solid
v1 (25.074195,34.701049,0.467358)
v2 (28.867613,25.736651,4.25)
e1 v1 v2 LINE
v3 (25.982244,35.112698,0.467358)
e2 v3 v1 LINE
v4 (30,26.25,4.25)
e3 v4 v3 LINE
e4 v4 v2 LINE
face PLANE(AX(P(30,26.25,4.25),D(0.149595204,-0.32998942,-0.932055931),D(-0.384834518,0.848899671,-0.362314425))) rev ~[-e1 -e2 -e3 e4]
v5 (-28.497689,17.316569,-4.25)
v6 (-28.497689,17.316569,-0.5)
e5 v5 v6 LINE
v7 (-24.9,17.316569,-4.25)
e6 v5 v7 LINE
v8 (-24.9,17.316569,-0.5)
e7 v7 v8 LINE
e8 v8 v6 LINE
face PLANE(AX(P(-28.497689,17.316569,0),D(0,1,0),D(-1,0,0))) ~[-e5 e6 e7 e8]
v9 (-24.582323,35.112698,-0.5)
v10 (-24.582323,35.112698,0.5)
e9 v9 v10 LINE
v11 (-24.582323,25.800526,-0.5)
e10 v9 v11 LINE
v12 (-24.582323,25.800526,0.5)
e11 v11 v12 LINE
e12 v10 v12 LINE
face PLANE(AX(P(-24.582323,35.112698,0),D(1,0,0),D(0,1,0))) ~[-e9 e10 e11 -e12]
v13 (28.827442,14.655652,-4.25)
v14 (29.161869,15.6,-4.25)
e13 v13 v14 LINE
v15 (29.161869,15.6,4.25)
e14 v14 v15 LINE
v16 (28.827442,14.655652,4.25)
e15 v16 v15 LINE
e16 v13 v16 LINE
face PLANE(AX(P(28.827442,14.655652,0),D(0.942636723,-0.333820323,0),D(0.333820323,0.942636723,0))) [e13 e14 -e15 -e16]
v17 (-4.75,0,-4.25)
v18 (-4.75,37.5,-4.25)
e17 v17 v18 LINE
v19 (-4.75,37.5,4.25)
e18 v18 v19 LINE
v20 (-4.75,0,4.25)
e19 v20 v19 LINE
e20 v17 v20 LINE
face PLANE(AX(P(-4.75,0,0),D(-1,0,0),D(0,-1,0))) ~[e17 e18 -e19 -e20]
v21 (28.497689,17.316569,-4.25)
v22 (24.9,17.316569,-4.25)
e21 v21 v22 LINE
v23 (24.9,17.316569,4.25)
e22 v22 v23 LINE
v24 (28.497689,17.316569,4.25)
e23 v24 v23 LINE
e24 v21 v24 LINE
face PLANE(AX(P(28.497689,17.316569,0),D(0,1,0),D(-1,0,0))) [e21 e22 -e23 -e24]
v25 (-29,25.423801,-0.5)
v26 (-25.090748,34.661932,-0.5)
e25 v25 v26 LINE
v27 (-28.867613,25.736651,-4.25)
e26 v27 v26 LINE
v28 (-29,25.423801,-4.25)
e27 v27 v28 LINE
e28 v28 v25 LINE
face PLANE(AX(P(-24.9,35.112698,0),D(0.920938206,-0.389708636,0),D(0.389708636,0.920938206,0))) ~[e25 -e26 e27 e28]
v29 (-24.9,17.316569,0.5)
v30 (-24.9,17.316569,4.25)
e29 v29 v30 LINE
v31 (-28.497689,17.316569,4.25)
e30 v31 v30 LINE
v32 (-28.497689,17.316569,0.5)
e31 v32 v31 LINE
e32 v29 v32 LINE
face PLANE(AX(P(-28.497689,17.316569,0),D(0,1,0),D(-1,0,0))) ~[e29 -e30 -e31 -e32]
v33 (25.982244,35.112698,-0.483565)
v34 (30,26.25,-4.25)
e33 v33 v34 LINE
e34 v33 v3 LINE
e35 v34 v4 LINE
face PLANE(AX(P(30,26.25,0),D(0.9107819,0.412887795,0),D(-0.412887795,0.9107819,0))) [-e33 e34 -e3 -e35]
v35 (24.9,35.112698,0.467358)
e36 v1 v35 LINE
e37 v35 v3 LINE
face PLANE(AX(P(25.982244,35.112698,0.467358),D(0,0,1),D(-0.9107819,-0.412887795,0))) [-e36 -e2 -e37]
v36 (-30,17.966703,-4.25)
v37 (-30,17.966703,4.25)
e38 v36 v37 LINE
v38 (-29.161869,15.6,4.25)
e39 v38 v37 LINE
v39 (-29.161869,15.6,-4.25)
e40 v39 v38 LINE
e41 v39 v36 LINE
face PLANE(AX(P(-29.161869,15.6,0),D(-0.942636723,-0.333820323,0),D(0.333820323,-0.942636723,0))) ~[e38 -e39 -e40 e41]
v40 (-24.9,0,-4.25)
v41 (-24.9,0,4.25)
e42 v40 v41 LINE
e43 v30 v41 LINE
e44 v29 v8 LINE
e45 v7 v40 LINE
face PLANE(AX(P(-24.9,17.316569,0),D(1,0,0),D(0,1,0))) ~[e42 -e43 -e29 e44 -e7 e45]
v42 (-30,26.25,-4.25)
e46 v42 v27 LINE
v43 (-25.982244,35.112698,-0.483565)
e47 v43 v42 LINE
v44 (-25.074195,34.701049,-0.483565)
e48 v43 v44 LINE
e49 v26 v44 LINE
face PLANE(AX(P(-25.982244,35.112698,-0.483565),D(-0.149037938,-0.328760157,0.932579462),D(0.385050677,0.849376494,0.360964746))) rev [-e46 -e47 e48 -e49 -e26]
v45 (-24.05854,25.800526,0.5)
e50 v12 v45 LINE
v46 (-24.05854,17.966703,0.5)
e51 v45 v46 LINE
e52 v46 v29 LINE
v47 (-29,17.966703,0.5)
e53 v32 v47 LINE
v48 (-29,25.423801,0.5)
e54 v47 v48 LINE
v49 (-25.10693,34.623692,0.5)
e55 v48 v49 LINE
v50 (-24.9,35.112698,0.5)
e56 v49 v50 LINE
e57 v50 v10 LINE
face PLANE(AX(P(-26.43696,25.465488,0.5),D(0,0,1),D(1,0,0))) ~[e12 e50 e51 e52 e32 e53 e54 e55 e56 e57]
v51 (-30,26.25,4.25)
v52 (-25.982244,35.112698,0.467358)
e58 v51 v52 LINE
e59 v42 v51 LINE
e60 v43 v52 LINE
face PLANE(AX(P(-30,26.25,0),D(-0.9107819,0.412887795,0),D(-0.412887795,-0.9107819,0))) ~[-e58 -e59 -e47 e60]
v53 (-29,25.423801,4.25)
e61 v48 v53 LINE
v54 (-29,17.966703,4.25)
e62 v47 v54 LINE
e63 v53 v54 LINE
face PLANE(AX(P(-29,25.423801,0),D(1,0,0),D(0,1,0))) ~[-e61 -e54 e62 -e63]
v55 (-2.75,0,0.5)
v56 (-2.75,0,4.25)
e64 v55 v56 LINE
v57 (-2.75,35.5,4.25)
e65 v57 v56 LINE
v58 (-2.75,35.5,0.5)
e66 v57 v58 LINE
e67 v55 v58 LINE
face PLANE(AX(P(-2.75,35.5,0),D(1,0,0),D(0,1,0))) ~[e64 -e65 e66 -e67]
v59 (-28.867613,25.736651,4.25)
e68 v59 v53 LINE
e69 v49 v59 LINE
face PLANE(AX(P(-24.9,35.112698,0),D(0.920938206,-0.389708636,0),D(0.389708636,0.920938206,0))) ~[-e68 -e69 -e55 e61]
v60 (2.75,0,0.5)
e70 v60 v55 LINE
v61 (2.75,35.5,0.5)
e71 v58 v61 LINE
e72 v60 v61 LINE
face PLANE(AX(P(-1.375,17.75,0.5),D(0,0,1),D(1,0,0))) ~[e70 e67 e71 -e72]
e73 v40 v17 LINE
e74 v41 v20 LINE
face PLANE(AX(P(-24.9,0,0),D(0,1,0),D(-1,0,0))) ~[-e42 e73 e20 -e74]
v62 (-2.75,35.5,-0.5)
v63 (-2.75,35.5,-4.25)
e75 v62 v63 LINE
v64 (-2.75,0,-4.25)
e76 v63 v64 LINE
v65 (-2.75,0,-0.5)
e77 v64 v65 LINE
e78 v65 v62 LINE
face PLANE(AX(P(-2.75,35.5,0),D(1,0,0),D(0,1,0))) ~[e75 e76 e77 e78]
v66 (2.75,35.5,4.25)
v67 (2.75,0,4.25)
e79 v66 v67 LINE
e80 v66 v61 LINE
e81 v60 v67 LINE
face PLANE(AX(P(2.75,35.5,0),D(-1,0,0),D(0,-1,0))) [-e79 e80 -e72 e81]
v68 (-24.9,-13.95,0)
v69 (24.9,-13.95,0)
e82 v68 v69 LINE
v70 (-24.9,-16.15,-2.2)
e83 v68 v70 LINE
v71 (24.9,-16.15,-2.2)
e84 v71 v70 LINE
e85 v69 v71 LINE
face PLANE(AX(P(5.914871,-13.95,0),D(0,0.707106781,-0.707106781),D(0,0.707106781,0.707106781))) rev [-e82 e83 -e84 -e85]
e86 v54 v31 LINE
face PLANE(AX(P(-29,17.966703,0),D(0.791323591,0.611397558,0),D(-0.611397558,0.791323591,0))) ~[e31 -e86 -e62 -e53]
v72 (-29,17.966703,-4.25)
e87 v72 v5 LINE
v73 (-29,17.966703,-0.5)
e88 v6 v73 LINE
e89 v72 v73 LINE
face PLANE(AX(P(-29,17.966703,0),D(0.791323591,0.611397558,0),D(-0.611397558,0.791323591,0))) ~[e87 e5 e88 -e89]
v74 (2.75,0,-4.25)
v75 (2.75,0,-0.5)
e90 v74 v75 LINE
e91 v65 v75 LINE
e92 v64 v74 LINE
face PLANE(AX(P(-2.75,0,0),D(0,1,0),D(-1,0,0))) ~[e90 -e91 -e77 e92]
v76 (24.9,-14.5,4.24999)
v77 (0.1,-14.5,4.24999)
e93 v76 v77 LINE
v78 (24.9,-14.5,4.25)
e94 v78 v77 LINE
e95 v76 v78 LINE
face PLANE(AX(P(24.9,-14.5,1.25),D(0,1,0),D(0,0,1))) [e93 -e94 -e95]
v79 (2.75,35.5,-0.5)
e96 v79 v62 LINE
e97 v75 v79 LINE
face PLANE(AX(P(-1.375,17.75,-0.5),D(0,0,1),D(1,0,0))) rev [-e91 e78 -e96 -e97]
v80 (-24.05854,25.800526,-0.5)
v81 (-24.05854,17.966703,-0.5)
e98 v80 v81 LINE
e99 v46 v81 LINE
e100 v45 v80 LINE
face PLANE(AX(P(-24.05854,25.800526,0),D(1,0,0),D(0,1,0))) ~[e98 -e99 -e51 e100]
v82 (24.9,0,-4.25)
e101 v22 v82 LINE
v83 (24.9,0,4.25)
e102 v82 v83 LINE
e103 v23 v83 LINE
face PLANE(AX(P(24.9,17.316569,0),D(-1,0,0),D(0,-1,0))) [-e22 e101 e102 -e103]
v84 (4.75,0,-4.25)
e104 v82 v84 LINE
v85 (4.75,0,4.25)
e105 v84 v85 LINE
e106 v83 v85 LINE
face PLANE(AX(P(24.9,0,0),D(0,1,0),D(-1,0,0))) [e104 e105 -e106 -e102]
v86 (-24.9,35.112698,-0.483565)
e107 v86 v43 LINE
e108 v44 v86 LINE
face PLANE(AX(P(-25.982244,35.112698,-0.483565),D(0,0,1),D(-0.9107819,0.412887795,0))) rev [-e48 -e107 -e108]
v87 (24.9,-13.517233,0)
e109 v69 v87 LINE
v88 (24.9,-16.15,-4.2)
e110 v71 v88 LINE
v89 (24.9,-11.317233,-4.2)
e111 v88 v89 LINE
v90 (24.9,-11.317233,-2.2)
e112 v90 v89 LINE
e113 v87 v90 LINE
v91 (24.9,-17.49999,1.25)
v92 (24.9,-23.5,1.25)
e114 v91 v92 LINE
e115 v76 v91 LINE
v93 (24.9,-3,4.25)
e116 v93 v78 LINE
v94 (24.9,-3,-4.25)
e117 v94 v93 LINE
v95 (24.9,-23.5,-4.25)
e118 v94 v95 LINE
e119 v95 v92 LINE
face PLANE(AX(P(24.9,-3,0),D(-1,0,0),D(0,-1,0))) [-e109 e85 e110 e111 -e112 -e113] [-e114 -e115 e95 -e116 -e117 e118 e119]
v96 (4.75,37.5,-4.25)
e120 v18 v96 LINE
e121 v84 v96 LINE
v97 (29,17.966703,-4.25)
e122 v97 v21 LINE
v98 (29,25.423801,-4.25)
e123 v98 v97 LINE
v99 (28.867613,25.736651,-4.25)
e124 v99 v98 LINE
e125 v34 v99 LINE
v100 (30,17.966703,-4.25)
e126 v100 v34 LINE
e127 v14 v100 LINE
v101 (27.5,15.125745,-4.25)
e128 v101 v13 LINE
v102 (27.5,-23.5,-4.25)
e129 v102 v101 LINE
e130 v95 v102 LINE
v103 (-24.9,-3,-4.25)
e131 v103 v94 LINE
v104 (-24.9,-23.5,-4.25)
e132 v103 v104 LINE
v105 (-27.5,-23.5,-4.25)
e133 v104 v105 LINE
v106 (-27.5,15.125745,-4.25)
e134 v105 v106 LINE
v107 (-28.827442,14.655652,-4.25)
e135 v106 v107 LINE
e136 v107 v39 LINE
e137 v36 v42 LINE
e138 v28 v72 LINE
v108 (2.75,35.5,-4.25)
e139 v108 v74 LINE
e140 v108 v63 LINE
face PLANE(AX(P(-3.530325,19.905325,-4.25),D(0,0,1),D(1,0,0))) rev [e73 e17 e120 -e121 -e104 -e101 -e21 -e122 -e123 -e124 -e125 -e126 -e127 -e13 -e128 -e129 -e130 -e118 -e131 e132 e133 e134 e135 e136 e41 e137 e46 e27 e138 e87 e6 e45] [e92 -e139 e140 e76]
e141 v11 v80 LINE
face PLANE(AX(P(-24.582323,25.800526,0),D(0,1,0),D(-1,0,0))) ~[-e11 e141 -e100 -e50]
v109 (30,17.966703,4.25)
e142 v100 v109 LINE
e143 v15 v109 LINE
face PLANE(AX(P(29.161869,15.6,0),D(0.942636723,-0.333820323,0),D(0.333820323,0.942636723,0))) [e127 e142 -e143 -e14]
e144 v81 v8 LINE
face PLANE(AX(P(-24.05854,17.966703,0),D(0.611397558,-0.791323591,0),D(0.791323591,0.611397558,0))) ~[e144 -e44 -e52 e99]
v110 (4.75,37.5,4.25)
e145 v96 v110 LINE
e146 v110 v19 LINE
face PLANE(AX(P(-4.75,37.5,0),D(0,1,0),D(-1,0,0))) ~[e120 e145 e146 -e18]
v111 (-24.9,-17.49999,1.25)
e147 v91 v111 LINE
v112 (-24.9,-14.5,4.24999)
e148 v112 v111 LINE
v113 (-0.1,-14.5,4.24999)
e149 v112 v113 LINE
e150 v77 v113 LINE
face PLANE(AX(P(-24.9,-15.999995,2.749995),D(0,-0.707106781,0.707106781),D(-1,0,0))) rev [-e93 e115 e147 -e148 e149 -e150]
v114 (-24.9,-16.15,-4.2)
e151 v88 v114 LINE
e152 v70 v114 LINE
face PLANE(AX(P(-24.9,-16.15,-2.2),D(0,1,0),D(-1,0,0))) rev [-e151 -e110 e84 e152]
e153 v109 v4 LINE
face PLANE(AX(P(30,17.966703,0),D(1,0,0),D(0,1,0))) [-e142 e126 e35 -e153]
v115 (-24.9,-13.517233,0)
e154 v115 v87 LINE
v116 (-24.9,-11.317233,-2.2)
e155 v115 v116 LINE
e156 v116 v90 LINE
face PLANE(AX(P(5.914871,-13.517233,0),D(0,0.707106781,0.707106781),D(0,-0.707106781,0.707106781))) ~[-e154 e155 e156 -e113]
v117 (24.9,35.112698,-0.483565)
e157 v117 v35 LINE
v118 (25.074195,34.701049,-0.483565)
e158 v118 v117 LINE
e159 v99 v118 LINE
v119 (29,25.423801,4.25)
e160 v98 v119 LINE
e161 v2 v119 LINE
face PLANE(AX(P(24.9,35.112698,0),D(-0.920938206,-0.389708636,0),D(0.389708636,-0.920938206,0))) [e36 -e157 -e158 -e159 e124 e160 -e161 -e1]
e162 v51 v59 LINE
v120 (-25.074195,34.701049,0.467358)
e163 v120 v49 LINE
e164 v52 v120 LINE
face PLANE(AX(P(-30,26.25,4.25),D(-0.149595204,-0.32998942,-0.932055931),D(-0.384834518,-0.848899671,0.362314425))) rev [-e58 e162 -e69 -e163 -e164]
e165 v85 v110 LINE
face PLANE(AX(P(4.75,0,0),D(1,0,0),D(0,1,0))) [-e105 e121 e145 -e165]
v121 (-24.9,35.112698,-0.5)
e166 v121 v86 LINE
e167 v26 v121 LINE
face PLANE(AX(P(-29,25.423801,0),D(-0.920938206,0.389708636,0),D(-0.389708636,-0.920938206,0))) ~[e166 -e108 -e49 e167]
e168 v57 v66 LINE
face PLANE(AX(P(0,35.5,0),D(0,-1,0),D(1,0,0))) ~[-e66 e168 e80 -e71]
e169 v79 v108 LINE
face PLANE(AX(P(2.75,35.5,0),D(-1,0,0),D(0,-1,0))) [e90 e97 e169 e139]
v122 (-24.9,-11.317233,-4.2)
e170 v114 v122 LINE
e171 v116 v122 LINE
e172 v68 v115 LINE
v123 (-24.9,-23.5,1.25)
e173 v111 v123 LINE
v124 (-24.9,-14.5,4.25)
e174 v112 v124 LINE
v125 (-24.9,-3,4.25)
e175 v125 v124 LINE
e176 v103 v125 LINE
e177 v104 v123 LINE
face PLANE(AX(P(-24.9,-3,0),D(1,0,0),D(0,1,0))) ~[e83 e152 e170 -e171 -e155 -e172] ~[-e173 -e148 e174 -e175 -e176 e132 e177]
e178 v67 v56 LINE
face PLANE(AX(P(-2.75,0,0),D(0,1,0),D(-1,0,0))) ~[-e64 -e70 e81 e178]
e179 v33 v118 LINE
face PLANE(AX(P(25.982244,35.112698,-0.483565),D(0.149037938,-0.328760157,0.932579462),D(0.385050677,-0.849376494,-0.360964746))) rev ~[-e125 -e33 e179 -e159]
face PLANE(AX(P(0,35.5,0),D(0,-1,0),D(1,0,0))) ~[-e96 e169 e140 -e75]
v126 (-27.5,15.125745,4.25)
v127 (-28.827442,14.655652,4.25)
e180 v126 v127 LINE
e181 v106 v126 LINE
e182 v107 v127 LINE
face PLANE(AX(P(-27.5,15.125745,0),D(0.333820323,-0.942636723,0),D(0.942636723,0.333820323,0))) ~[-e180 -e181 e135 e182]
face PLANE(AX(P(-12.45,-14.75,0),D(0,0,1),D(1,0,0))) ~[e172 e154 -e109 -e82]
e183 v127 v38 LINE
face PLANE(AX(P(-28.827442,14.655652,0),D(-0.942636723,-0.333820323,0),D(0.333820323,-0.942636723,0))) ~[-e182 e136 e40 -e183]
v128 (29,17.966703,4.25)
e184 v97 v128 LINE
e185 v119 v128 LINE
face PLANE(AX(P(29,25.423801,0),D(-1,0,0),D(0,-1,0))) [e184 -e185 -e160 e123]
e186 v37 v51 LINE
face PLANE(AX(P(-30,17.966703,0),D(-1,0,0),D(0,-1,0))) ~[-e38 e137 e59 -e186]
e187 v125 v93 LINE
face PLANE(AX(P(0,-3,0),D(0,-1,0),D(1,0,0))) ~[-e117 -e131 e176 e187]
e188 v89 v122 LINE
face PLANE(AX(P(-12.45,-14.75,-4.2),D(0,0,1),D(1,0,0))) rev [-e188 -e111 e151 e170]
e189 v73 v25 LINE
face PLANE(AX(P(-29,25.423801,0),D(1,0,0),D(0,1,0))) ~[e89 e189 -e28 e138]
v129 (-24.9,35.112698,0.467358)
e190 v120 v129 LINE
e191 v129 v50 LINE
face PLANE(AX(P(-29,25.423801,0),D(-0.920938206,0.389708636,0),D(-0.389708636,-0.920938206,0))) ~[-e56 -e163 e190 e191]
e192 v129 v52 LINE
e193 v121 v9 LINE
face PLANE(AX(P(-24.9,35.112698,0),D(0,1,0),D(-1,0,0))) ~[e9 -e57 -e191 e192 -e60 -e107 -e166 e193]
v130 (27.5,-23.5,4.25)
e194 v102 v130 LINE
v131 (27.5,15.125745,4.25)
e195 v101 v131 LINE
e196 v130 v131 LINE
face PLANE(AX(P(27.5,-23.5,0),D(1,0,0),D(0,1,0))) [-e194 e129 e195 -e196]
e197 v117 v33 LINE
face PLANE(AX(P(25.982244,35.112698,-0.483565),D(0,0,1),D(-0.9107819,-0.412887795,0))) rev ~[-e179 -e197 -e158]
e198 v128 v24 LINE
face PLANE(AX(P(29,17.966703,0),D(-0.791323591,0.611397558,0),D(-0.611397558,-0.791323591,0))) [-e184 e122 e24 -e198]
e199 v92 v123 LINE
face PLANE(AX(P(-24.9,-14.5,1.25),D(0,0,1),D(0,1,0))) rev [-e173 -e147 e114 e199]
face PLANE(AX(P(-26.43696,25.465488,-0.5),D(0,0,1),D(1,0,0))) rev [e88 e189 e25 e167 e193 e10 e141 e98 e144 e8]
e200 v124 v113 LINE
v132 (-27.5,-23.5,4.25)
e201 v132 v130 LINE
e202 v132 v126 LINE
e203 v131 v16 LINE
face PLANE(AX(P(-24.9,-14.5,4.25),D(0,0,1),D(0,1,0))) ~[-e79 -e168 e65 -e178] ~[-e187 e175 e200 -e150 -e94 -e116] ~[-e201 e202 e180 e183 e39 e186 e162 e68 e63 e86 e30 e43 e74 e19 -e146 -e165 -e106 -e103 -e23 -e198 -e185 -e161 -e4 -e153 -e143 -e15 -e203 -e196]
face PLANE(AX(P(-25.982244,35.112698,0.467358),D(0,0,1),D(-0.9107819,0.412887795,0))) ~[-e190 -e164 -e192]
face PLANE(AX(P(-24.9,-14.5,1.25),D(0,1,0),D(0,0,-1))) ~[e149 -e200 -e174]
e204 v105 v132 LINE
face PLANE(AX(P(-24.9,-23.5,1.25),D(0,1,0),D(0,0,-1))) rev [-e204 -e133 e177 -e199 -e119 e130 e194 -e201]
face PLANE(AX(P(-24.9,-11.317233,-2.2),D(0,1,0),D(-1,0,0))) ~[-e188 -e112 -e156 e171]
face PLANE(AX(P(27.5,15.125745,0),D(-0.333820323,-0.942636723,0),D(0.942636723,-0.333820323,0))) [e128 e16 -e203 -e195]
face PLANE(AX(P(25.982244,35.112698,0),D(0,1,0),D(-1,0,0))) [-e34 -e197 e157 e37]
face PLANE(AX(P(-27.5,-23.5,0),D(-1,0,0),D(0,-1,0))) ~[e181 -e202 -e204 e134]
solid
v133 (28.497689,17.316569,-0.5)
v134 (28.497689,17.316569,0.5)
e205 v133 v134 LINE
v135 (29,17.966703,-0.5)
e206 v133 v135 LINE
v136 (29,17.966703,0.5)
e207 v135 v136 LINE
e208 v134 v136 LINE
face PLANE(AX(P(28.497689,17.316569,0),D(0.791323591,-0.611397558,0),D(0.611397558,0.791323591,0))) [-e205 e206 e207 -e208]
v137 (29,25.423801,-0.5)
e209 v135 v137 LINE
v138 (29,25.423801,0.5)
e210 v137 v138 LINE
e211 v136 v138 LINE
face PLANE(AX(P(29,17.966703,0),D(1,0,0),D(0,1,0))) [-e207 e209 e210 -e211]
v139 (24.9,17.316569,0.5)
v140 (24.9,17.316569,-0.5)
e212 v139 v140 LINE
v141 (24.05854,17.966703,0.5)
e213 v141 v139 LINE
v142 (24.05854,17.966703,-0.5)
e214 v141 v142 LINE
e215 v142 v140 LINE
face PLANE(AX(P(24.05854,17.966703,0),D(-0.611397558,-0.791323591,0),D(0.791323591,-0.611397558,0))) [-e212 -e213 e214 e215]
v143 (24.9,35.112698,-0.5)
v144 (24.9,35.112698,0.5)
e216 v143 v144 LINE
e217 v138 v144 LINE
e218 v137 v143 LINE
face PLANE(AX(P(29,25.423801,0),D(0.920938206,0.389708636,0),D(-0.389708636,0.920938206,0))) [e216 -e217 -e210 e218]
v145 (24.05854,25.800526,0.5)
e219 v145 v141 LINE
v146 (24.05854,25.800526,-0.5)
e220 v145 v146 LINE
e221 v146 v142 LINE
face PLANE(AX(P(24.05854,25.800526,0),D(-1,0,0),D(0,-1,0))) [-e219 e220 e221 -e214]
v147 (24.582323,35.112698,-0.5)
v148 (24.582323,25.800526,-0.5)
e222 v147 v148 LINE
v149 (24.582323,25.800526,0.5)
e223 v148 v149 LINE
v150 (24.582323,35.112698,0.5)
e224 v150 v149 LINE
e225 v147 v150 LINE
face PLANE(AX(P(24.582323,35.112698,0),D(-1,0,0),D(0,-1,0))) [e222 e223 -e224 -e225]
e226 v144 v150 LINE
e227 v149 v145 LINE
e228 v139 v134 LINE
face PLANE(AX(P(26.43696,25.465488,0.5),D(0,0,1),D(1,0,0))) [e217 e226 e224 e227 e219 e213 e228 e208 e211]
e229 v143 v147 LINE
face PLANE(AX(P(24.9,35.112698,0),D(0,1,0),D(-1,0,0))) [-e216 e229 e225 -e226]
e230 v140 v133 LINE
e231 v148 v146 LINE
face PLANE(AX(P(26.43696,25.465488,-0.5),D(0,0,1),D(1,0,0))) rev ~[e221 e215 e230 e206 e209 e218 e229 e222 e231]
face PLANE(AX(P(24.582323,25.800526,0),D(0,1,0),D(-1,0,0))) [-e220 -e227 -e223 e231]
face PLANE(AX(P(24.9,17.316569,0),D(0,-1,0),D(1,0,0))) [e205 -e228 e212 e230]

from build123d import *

# Parameters (mm, degrees)
F0_W        = 2.75
F0_H        = 35.5
F1_DEPTH    = 0.5
F2_DEPTH    = 4.25
F0_W_2      = 24.9
F0_H_2      = 3
F0_H_3      = 2.0327672064
F3_DEPTH    = 2.2
F4_T1_DEPTH = 30.8148708723
F5_W        = 9
F5_H        = 3
F6_DEPTH    = 25
F7_SIZE     = 2.99999
F8_DEPTH    = 2
F10_DEPTH   = 15
F11_DEPTH   = 25


# Not quite as in the source:
# - a fillet or chamfer that OpenCascade refuses, or shapes differently, is made with other operations: its cross-section is extruded or revolved along the edge and cut away or added
# - a fillet or chamfer is up to 0.001 mm smaller than in the source, because OpenCascade refuses the exact size


with BuildPart() as f1:
    # F0 (on Top) → F1 (new body, symmetric)
    with BuildSketch(Plane.XY):
        with Locations((1.375, 17.75)):
            Rectangle(F0_W, F0_H)
    extrude(amount=F1_DEPTH, both=True)

    # F0 (on Top) → F2 (join, symmetric)
    with BuildSketch(Plane.XY):
        Polygon((2.75, 35.5), (2.75, 0), (4.75, 0), (4.75, 37.5), (0, 37.5), (0, 35.5), align=None)
        Polygon((2.75, 0), (0, 0), (0, -3), (24.9, -3), (27.5, -3), (27.5, 0), (24.9, 0), (4.75, 0), align=None)
        Polygon((24.9, 15.6), (24.9, 0), (27.5, 0), (27.5, 15.1257448723), (27.5, 15.6), align=None)
        Polygon((27.5, -3), (24.9, -3), (24.9, -11.2172327936), (24.9, -13.25), (24.9, -16.25), (24.9, -23.5), (27.5, -23.5), align=None)
        Polygon((24.9, 17.3165686429), (24.9, 15.6), (27.5, 15.6), (29.1618686169, 15.6), (30, 17.9667025805), (30, 26.25), (25.9822437406, 35.1126976311), (24.9, 35.1126976311), (29, 25.4238011199), (29, 17.9667025805), (28.4976893067, 17.3165686429), align=None)
        Polygon((27.5, 15.6), (27.5, 15.1257448723), (28.8274421366, 14.6556516198), (29.1618686169, 15.6), align=None)
    extrude(amount=F2_DEPTH, both=True)

    # F0 (on Top) → F3 (join)
    with BuildSketch(Plane.XY):
        with Locations((12.45, -14.75)):
            Rectangle(F0_W_2, F0_H_2)
        with Locations((12.45, -12.2336163968)):
            Rectangle(F0_W_2, F0_H_3)
    extrude(amount=-F3_DEPTH)

    # F4: chamfer of 2.3 on 2 edges, made by hand

    # F4_s2 → F4_t1 (cut)
    with BuildSketch(Plane.YZ.offset(-5.9148708723)):
        Polygon((-13.95, 0), (-16.25, -2.3), (-16.25, 0), align=None)
        Polygon((-13.5172327936, 0), (-11.2172327936, -2.3), (-11.2172327936, 0), align=None)
    extrude(amount=F4_T1_DEPTH, mode=Mode.SUBTRACT)

    # F5 (on face) → F6 (join)
    with BuildSketch(Plane(origin=(24.9, 0, 0), x_dir=(0, -1, 0), z_dir=(-1, 0, 0))):
        with Locations((19, 2.75)):
            Rectangle(F5_W, F5_H)
    extrude(amount=F6_DEPTH)

    # F7 (size 3 in the source; OpenCascade refuses exactly that, so slightly less here)
    f7_edges = [f1.edges().sort_by_distance(p)[0] for p in [
        (12.4, -14.5, 1.25),
    ]]
    chamfer(f7_edges, length=F7_SIZE)

    # F8 (add): a face of the model
    f8_faces = [f1.faces().sort_by_distance(p)[0] for p in [
        (12.45, -13.7336163968, -2.2),
    ]]
    extrude(f8_faces, amount=F8_DEPTH)

    # F9 (on face) → F10 (cut)
    with BuildSketch(Plane(origin=(34.7570417343, 15.7565255862, 0), x_dir=(-0.4128877946, 0.9107818998, 0), z_dir=(0.9107818998, 0.4128877946, 0))):
        Polygon((21.2522581403, 4.25), (11.521391033, 4.25), (21.2522581403, 0.467358419), align=None)
        Polygon((21.2522581403, -0.4835649452), (11.521391033, -4.25), (21.2522581403, -4.25), align=None)
    extrude(amount=-F10_DEPTH, mode=Mode.SUBTRACT)

    # F11 (cut): faces of the model
    f11_faces = [f1.faces().sort_by_distance(p)[0] for p in [
        (25.5282194828, 34.9068733009, 2.3586792095),
        (25.5282194828, 34.9068733009, -2.3667824726),
    ]]
    extrude(f11_faces, amount=-F11_DEPTH, mode=Mode.SUBTRACT)

    # F12: F1, F1b across plane


with BuildPart() as f1b:
    # F0 (on Top) → F1, piece 2 (new body, symmetric)
    with BuildSketch(Plane.XY):
        Polygon((24.9, 35.1126976311), (24.9, 17.3165686429), (28.4976893067, 17.3165686429), (29, 17.9667025805), (29, 25.4238011199), align=None)
        Polygon((24.0585404363, 17.9667025805), (24.9, 17.3165686429), (24.9, 35.1126976311), (24.5823226869, 35.1126976311), (24.5823226869, 25.8005261421), (24.0585404363, 25.8005261421), align=None)
    extrude(amount=F1_DEPTH, both=True)


with BuildPart() as f1_1:
    add(f1.part)
    add(f1.part.mirror(Plane.YZ))
    add(f1b.part.mirror(Plane.YZ))


solid = Compound([f1b.part, f1_1.part])
